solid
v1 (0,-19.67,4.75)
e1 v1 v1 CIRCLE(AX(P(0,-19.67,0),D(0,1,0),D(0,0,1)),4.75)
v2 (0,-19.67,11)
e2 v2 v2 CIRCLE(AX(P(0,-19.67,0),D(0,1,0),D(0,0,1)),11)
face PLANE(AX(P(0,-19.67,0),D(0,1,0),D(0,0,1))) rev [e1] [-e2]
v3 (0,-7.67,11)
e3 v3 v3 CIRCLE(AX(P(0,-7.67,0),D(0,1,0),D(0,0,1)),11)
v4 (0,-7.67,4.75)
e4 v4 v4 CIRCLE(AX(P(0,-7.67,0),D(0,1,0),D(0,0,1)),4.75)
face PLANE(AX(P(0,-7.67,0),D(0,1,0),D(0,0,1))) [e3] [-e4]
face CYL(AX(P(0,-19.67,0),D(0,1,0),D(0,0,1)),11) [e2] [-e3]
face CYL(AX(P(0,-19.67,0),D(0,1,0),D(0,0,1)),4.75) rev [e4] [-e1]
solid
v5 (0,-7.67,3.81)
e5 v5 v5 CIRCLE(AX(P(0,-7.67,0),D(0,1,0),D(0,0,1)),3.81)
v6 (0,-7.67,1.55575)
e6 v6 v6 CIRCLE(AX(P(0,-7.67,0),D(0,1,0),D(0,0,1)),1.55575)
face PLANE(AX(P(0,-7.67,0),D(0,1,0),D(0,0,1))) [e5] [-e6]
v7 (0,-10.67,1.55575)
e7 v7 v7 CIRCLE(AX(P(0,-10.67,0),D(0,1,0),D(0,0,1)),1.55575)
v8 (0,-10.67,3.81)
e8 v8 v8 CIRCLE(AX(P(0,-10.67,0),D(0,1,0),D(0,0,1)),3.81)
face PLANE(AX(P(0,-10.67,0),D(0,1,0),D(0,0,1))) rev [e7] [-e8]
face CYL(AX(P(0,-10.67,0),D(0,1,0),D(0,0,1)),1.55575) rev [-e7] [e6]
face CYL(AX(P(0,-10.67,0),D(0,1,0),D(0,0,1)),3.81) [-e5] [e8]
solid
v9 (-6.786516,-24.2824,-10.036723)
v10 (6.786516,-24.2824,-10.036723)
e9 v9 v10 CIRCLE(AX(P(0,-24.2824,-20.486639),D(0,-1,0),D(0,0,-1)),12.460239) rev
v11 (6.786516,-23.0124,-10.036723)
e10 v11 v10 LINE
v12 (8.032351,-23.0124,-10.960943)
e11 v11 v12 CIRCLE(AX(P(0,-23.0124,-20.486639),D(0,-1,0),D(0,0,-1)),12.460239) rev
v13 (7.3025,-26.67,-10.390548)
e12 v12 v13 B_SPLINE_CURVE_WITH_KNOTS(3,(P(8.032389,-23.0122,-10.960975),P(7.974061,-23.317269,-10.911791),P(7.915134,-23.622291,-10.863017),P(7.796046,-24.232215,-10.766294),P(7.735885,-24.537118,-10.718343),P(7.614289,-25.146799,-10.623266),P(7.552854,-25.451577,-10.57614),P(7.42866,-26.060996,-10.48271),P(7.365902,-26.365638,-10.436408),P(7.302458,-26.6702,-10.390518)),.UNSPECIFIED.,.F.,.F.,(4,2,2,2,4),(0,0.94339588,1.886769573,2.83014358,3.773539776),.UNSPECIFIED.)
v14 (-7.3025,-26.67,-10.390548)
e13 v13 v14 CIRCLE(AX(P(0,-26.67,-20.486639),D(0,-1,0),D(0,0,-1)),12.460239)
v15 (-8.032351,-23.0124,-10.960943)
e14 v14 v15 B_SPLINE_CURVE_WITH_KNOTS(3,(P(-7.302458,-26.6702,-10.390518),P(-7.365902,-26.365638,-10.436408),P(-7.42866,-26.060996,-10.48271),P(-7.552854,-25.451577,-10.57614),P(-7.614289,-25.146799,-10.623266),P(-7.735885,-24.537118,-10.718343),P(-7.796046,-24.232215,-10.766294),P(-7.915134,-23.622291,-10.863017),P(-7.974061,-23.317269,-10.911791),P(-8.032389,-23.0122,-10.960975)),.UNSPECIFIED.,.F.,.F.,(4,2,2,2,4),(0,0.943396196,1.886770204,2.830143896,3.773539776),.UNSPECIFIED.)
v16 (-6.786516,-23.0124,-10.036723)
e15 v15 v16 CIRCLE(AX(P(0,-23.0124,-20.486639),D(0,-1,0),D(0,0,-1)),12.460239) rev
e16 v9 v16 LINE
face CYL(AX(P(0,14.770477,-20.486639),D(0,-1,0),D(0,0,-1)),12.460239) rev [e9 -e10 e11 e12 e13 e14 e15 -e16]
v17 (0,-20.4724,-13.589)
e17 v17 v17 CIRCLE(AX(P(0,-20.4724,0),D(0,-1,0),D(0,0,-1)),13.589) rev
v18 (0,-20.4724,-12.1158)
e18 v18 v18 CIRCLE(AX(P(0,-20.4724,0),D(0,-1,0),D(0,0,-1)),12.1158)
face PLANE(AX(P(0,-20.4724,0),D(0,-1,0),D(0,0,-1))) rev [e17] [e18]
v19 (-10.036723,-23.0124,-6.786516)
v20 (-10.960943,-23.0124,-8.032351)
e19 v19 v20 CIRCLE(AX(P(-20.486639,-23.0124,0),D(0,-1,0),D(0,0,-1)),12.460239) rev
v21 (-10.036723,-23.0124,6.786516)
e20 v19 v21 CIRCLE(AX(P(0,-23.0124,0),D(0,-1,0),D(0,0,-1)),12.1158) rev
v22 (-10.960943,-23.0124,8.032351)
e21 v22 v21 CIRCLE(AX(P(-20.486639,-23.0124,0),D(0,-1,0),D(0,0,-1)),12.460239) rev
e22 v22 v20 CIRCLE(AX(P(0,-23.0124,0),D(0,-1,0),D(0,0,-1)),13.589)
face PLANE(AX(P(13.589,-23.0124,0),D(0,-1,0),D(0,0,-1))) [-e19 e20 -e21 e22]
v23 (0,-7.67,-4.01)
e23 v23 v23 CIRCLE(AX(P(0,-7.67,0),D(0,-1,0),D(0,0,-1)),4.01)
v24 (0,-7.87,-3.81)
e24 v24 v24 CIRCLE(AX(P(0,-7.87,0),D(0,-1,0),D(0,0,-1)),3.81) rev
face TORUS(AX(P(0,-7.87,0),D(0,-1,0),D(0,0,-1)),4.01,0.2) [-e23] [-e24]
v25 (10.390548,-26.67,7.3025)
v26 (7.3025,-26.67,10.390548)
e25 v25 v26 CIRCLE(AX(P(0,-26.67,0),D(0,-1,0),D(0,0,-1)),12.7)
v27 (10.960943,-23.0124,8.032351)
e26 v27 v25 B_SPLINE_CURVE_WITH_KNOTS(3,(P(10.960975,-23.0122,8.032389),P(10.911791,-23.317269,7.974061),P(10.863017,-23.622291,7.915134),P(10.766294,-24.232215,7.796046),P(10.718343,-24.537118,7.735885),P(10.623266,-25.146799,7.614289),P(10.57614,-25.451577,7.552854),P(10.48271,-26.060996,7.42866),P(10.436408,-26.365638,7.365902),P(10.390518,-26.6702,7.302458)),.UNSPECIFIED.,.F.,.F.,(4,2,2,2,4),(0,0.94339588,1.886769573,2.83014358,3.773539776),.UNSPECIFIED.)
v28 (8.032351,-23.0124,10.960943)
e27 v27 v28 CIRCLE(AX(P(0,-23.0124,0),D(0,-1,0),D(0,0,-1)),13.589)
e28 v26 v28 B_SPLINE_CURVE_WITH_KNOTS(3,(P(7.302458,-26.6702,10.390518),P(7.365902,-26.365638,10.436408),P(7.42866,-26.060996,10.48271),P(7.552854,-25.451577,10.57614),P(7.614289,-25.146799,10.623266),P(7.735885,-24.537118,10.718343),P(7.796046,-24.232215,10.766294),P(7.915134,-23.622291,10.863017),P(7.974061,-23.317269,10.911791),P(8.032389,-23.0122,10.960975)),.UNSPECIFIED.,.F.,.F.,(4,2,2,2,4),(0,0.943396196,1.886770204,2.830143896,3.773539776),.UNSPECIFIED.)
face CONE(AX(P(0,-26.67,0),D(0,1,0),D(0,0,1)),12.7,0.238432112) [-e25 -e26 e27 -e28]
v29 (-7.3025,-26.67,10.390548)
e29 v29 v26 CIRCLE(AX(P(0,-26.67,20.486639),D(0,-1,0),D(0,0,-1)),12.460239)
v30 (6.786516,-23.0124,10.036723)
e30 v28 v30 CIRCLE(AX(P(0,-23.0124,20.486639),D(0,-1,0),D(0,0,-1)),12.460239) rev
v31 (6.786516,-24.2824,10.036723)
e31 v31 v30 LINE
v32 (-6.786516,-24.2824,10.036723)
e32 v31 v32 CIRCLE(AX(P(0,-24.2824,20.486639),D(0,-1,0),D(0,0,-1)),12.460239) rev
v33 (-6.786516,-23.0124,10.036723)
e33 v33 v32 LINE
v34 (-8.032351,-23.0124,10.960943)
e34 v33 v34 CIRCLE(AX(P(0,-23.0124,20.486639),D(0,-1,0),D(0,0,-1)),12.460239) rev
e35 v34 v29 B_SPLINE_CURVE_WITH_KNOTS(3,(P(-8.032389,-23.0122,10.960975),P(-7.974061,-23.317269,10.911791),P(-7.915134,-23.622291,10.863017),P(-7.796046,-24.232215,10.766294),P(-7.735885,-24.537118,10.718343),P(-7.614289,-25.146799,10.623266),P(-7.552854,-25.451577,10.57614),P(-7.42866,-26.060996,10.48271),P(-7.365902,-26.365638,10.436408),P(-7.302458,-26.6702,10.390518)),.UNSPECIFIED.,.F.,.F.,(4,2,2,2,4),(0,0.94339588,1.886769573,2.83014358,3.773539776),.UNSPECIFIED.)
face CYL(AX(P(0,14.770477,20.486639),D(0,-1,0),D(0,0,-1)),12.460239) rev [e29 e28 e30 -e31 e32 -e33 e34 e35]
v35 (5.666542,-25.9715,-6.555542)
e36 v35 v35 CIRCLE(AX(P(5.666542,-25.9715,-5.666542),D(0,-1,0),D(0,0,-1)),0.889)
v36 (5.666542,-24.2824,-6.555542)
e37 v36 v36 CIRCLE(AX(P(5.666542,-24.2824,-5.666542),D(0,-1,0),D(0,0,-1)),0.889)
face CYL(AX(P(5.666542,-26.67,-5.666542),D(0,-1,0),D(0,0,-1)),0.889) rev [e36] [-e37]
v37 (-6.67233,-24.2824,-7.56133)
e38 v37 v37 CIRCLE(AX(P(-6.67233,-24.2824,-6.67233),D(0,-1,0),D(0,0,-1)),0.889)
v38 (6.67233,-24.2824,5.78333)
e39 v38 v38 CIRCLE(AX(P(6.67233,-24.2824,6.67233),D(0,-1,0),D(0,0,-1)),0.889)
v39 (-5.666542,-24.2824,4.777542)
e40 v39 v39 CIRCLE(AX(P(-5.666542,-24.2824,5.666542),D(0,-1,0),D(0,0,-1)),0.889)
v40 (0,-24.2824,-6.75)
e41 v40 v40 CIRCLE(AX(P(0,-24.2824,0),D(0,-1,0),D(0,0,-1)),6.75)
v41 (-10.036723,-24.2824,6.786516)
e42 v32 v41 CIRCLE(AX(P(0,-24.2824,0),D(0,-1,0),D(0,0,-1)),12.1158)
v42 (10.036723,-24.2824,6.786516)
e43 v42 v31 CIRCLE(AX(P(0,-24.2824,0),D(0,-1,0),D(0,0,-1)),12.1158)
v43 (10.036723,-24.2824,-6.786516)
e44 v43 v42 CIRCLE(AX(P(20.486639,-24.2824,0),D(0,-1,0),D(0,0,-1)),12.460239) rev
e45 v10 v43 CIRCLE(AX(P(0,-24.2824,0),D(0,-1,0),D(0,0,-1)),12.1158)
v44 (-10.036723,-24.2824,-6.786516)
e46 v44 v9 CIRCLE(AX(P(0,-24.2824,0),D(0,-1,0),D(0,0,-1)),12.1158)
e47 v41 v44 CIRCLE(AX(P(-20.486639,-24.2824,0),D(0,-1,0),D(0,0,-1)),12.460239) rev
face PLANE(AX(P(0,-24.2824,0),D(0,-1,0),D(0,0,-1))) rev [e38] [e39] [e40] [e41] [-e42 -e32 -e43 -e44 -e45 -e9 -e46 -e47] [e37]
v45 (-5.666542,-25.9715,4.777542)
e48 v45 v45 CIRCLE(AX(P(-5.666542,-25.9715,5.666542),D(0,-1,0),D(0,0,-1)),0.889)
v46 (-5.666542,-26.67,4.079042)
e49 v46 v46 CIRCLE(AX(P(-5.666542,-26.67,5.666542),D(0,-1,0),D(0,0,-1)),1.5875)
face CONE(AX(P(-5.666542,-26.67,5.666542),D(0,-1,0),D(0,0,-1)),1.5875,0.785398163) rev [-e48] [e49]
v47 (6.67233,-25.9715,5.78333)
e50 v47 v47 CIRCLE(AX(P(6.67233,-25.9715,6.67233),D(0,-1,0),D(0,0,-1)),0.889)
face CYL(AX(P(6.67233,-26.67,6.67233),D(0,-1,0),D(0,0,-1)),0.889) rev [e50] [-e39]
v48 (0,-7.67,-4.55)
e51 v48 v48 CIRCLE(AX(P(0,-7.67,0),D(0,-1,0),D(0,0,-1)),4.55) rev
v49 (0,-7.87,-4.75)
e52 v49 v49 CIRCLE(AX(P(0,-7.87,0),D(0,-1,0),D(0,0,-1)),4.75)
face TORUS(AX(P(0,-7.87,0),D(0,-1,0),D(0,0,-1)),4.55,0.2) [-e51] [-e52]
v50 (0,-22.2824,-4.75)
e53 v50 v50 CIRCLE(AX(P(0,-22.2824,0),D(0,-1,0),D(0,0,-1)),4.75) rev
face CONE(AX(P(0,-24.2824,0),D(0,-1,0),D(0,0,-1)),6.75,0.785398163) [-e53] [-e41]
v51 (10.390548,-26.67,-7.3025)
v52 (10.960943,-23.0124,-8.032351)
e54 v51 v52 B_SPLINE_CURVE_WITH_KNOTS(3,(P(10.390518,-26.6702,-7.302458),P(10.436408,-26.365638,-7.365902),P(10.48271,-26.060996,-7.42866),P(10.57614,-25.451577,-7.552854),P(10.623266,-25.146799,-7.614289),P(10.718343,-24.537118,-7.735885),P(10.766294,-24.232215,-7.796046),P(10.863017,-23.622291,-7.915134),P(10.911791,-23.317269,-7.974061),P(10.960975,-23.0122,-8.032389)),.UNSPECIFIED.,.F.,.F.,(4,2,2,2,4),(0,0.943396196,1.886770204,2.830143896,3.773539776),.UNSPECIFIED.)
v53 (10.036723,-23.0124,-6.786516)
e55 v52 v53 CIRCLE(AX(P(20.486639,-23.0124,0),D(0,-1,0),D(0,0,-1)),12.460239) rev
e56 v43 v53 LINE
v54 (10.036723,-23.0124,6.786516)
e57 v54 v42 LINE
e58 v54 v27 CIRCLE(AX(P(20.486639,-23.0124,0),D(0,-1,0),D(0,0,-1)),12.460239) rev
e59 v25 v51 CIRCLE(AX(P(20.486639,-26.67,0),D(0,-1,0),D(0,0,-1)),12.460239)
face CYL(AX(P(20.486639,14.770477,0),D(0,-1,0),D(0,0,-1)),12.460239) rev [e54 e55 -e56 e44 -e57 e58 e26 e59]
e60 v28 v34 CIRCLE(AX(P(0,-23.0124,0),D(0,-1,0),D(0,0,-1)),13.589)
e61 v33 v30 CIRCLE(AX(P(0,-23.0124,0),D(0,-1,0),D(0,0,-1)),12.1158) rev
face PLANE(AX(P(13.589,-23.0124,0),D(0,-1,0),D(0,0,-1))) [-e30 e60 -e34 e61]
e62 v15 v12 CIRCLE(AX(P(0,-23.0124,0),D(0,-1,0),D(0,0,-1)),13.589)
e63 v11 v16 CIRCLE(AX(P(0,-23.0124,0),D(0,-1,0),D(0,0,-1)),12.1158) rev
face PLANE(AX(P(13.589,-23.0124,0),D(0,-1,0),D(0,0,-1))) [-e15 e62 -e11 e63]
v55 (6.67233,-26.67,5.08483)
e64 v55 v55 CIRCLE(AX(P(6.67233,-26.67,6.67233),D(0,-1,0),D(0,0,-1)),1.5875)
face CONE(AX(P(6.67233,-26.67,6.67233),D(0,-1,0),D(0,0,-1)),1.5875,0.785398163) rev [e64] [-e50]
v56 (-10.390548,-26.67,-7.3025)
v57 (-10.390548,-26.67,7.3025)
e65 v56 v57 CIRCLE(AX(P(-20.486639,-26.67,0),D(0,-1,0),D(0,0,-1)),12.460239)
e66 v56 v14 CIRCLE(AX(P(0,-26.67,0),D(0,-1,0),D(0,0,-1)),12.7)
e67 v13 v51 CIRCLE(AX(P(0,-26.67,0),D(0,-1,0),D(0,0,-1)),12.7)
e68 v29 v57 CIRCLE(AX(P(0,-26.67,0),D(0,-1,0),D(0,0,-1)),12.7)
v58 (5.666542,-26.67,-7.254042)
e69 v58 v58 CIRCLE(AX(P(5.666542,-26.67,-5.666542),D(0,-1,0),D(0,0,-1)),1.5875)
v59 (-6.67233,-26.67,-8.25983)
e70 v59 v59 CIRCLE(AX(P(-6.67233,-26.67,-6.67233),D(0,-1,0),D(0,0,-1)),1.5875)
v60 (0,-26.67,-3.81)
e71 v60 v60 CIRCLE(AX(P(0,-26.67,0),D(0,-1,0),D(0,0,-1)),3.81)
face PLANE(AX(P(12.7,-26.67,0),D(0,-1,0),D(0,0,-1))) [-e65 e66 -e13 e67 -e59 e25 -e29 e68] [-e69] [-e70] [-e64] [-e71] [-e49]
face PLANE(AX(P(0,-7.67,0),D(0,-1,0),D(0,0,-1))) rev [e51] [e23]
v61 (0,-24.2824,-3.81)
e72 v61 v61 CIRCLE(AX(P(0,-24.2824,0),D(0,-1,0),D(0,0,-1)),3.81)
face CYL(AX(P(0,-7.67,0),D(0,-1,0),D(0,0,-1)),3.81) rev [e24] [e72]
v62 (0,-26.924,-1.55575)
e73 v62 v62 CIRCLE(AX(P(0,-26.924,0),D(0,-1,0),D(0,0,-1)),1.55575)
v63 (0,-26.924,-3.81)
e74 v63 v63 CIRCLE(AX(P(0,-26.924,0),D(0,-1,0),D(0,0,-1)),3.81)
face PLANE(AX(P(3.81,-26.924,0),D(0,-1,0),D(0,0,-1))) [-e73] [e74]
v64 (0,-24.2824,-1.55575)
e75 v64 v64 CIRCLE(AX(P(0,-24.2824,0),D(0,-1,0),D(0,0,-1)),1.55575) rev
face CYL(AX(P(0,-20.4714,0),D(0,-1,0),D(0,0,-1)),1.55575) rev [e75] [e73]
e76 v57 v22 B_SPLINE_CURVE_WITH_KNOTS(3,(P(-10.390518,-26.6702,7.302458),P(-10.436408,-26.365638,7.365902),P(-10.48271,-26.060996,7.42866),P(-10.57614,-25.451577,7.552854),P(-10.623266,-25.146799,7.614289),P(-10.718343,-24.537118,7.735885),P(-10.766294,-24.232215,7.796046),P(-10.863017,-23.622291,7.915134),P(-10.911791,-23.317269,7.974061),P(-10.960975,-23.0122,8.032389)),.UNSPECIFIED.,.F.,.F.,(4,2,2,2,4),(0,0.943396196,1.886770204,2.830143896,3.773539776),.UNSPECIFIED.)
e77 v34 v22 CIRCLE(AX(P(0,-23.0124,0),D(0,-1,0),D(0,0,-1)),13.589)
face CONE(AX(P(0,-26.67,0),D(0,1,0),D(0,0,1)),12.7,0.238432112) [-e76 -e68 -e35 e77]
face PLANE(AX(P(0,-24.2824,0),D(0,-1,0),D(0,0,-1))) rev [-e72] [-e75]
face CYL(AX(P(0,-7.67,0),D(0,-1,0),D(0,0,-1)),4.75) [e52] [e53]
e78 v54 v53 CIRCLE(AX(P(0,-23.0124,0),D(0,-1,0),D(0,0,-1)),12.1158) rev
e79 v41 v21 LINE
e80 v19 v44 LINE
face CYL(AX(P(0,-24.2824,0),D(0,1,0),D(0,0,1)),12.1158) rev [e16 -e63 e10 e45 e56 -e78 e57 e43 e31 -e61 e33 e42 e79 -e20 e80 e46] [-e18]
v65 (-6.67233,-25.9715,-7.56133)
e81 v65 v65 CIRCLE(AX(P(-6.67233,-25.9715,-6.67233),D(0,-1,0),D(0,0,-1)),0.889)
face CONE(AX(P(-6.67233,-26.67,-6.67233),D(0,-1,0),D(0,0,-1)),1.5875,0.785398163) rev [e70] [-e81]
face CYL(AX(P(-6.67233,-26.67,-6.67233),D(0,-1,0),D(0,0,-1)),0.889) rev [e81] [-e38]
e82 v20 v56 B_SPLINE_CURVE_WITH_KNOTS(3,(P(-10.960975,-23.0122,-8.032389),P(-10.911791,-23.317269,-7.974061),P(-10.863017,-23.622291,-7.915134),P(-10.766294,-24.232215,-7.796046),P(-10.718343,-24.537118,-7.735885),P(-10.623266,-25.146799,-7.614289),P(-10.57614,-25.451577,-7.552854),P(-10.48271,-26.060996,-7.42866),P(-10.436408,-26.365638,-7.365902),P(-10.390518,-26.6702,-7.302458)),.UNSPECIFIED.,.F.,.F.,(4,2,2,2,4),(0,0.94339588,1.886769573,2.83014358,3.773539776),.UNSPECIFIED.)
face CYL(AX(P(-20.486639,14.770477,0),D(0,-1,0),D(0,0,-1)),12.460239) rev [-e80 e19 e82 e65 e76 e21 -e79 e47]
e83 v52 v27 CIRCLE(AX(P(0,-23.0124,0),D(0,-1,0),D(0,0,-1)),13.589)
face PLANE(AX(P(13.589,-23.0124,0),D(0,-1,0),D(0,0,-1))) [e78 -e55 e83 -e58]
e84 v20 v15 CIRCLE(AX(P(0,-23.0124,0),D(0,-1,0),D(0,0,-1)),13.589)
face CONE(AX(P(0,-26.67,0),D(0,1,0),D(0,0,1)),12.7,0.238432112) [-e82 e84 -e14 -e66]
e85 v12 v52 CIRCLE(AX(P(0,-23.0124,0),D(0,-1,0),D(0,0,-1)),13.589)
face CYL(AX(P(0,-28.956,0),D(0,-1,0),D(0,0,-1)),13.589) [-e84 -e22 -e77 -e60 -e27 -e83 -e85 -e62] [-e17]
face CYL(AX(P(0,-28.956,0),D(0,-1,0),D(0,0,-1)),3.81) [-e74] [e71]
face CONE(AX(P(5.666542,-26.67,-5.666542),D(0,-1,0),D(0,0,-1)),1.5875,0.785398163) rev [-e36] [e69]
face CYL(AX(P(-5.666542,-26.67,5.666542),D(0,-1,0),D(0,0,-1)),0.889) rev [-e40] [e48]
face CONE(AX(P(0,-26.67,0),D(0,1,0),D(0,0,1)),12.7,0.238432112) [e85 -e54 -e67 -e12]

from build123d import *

# Parameters (mm, degrees)
SKETCH2_R                       = 3.4925
CUT_EXTRUDE1_DEPTH              = 5.08
SKETCH3_R                       = 12.460238567
CUT_EXTRUDE2_DEPTH              = 3.6576
CUT_EXTRUDE3_DEPTH              = 1.27
CUT_EXTRUDE3_DEPTH_BACK         = 2.54
SKETCH4_R                       = 12.1158
F_4_40_TAPPED_HOLE1_D           = 1.778
F_4_40_TAPPED_HOLE1_DEPTH       = 2.54
F_4_40_TAPPED_HOLE1_CSINK_D     = 3.175
F_4_40_TAPPED_HOLE1_CSINK_ANGLE = 90
F_4_40_TAPPED_HOLE1_TIP         = 0.53416509
SKETCH13_R                      = 32.431124965
CUT_EXTRUDE5_DEPTH              = 38.213955992
CUT_EXTRUDE6_REACH              = 23.007
SKETCH14_R                      = 1.55575
BOSS_EXTRUDE1_START             = -2.3876
SKETCH15_R                      = 4.75
SKETCH15_R_2                    = 3.81
BOSS_EXTRUDE1_DEPTH             = 19
CHAMFER1_SIZE                   = 2
SKETCH16_R                      = 11
SKETCH16_R_2                    = 4.75
BOSS_EXTRUDE2_DEPTH             = 12
SKETCH17_R                      = 3.81
SKETCH17_R_2                    = 1.55575
BOSS_EXTRUDE3_DEPTH             = 3
FILLET1_R                       = 0.2
FILLET2_R                       = 0.2


with BuildPart() as part:
    # Sketch1 → Revolve1 (revolve)
    with BuildSketch(Plane.XY, mode=Mode.PRIVATE) as revolve1_sk:
        Polygon((0, 11.176), (1.55575, 11.176), (1.55575, 0), (4.445, 0), (4.445, -1.524), (8.89, -1.524), (13.589, -5.08), (13.589, -5.842), (13.843, -5.842), (13.843, -20.4724), (13.589, -20.4724), (13.589, -23.0124), (12.7, -26.67), (3.81, -26.67), (3.81, -26.924), (1.55575, -26.924), (1.55575, -28.956), (0, -28.956), align=None)
    revolve(revolve1_sk.sketch.rotate(Axis((0, -28.956, 0), (0, 1, 0)), 90), axis=Axis((0, -28.956, 0), (0, 1, 0)))

    # Sketch2 → Cut-Extrude1 (cut)
    with BuildSketch(Plane(origin=(0, -1.524, 0), x_dir=(1, 0, 0), z_dir=(0, 1, 0))):
        with Locations(Location((0, 7.9375, 0), (0, 0, 270))):
            Circle(SKETCH2_R)
        with Locations(Location((7.9375, 0, 0), (0, 0, 270))):
            Circle(SKETCH2_R)
        with Locations(Location((0, -7.9375, 0), (0, 0, 270))):
            Circle(SKETCH2_R)
        with Locations(Location((-7.9375, 0, 0), (0, 0, 270))):
            Circle(SKETCH2_R)
    extrude(amount=-CUT_EXTRUDE1_DEPTH, mode=Mode.SUBTRACT)

    # Sketch3 → Cut-Extrude2 (cut)
    with BuildSketch(Plane.XZ.offset(26.67)):
        with Locations((0, 20.486638567)):
            Circle(SKETCH3_R)
        with Locations((-20.486638567, 0)):
            Circle(SKETCH3_R)
        with Locations((0, -20.486638567)):
            Circle(SKETCH3_R)
        with Locations((20.486638567, 0)):
            Circle(SKETCH3_R)
    extrude(amount=-CUT_EXTRUDE2_DEPTH, mode=Mode.SUBTRACT)

    # Sketch4 → Cut-Extrude3 (cut, two sides: drawn at the far end of the back side and taken through both)
    with BuildSketch(Plane.XZ.offset(23.0124).offset(-CUT_EXTRUDE3_DEPTH_BACK)):
        with Locations(Location((0, 0, 0), (0, 0, 124.065321666))):
            Circle(SKETCH4_R)
    extrude(amount=CUT_EXTRUDE3_DEPTH + CUT_EXTRUDE3_DEPTH_BACK, mode=Mode.SUBTRACT)

    # #4-40 Tapped Hole1
    with Locations(Plane(origin=(0, -26.67, 0), x_dir=(-1, 0, 0), z_dir=(0, -1, 0))):
        with Locations((5.666541612, -5.666541612), (-6.672330298, -6.672330298), (-5.666541612, 5.666541612), (6.672330298, 6.672330298)):
            CounterSinkHole(F_4_40_TAPPED_HOLE1_D / 2, F_4_40_TAPPED_HOLE1_CSINK_D / 2, depth=F_4_40_TAPPED_HOLE1_DEPTH, counter_sink_angle=F_4_40_TAPPED_HOLE1_CSINK_ANGLE)
            with Locations((0, 0, -(F_4_40_TAPPED_HOLE1_DEPTH + F_4_40_TAPPED_HOLE1_TIP / 2))):  # 118° drill point
                Cone(0, F_4_40_TAPPED_HOLE1_D / 2, F_4_40_TAPPED_HOLE1_TIP, mode=Mode.SUBTRACT)

    # Sketch13 → Cut-Extrude5 (cut, through all)
    with BuildSketch(Plane.XZ.offset(20.4724)):
        Circle(SKETCH13_R)
    extrude(amount=-CUT_EXTRUDE5_DEPTH, mode=Mode.SUBTRACT)

    # Sketch14 → Cut-Extrude6 (cut, up to next)
    with BuildSketch(Plane.XZ.offset(28.956), mode=Mode.PRIVATE) as cut_extrude6_sk1:
        with Locations(Location((0, 0, 0), (0, 0, 270))):
            Circle(SKETCH14_R)
    cut_extrude6_tool1 = extrude(cut_extrude6_sk1.sketch, amount=-CUT_EXTRUDE6_REACH, mode=Mode.PRIVATE) & part.part
    add(cut_extrude6_tool1.solids().sort_by_distance((0, -28.956, 0))[0], mode=Mode.SUBTRACT)

    # Sketch15 → Boss-Extrude1 (add)
    with BuildSketch(Plane(origin=(0, -24.2824, 0), x_dir=(1, 0, 0), z_dir=(0, 1, 0)).offset(BOSS_EXTRUDE1_START)):
        with Locations(Location((0, 0, 0), (0, 0, 90))):
            Circle(SKETCH15_R)
        with Locations(Location((0, 0, 0), (0, 0, 90))):
            Circle(SKETCH15_R_2, mode=Mode.SUBTRACT)
    extrude(amount=BOSS_EXTRUDE1_DEPTH)

    # Chamfer1
    chamfer1_edges = [part.edges().sort_by_distance(p)[0] for p in [
        (0, -24.2824, 4.75),
    ]]
    chamfer(chamfer1_edges, length=CHAMFER1_SIZE)

    # Fillet1
    fillet1_edges = [part.edges().sort_by_distance(p)[0] for p in [
        (0, -7.67, 4.75),
    ]]
    fillet(fillet1_edges, radius=FILLET1_R)

    # Fillet2
    fillet2_edges = [part.edges().sort_by_distance(p)[0] for p in [
        (0, -7.67, 3.81),
    ]]
    fillet(fillet2_edges, radius=FILLET2_R)


with BuildPart() as body_2:
    # Sketch16 → Boss-Extrude2 (new body)
    with BuildSketch(Plane(origin=(0, -7.67, 0), x_dir=(1, 0, 0), z_dir=(0, 1, 0))):
        with Locations(Location((0, 0, 0), (0, 0, 270))):
            Circle(SKETCH16_R)
        with Locations(Location((0, 0, 0), (0, 0, 270))):
            Circle(SKETCH16_R_2, mode=Mode.SUBTRACT)
    extrude(amount=-BOSS_EXTRUDE2_DEPTH)


with BuildPart() as body_3:
    # Sketch17 → Boss-Extrude3 (new body)
    with BuildSketch(Plane(origin=(0, -7.67, 0), x_dir=(1, 0, 0), z_dir=(0, 1, 0))):
        with Locations(Location((0, 0, 0), (0, 0, 270))):
            Circle(SKETCH17_R)
        with Locations(Location((0, 0, 0), (0, 0, 270))):
            Circle(SKETCH17_R_2, mode=Mode.SUBTRACT)
    extrude(amount=-BOSS_EXTRUDE3_DEPTH)


solid = Compound([part.part, body_2.part, body_3.part])
